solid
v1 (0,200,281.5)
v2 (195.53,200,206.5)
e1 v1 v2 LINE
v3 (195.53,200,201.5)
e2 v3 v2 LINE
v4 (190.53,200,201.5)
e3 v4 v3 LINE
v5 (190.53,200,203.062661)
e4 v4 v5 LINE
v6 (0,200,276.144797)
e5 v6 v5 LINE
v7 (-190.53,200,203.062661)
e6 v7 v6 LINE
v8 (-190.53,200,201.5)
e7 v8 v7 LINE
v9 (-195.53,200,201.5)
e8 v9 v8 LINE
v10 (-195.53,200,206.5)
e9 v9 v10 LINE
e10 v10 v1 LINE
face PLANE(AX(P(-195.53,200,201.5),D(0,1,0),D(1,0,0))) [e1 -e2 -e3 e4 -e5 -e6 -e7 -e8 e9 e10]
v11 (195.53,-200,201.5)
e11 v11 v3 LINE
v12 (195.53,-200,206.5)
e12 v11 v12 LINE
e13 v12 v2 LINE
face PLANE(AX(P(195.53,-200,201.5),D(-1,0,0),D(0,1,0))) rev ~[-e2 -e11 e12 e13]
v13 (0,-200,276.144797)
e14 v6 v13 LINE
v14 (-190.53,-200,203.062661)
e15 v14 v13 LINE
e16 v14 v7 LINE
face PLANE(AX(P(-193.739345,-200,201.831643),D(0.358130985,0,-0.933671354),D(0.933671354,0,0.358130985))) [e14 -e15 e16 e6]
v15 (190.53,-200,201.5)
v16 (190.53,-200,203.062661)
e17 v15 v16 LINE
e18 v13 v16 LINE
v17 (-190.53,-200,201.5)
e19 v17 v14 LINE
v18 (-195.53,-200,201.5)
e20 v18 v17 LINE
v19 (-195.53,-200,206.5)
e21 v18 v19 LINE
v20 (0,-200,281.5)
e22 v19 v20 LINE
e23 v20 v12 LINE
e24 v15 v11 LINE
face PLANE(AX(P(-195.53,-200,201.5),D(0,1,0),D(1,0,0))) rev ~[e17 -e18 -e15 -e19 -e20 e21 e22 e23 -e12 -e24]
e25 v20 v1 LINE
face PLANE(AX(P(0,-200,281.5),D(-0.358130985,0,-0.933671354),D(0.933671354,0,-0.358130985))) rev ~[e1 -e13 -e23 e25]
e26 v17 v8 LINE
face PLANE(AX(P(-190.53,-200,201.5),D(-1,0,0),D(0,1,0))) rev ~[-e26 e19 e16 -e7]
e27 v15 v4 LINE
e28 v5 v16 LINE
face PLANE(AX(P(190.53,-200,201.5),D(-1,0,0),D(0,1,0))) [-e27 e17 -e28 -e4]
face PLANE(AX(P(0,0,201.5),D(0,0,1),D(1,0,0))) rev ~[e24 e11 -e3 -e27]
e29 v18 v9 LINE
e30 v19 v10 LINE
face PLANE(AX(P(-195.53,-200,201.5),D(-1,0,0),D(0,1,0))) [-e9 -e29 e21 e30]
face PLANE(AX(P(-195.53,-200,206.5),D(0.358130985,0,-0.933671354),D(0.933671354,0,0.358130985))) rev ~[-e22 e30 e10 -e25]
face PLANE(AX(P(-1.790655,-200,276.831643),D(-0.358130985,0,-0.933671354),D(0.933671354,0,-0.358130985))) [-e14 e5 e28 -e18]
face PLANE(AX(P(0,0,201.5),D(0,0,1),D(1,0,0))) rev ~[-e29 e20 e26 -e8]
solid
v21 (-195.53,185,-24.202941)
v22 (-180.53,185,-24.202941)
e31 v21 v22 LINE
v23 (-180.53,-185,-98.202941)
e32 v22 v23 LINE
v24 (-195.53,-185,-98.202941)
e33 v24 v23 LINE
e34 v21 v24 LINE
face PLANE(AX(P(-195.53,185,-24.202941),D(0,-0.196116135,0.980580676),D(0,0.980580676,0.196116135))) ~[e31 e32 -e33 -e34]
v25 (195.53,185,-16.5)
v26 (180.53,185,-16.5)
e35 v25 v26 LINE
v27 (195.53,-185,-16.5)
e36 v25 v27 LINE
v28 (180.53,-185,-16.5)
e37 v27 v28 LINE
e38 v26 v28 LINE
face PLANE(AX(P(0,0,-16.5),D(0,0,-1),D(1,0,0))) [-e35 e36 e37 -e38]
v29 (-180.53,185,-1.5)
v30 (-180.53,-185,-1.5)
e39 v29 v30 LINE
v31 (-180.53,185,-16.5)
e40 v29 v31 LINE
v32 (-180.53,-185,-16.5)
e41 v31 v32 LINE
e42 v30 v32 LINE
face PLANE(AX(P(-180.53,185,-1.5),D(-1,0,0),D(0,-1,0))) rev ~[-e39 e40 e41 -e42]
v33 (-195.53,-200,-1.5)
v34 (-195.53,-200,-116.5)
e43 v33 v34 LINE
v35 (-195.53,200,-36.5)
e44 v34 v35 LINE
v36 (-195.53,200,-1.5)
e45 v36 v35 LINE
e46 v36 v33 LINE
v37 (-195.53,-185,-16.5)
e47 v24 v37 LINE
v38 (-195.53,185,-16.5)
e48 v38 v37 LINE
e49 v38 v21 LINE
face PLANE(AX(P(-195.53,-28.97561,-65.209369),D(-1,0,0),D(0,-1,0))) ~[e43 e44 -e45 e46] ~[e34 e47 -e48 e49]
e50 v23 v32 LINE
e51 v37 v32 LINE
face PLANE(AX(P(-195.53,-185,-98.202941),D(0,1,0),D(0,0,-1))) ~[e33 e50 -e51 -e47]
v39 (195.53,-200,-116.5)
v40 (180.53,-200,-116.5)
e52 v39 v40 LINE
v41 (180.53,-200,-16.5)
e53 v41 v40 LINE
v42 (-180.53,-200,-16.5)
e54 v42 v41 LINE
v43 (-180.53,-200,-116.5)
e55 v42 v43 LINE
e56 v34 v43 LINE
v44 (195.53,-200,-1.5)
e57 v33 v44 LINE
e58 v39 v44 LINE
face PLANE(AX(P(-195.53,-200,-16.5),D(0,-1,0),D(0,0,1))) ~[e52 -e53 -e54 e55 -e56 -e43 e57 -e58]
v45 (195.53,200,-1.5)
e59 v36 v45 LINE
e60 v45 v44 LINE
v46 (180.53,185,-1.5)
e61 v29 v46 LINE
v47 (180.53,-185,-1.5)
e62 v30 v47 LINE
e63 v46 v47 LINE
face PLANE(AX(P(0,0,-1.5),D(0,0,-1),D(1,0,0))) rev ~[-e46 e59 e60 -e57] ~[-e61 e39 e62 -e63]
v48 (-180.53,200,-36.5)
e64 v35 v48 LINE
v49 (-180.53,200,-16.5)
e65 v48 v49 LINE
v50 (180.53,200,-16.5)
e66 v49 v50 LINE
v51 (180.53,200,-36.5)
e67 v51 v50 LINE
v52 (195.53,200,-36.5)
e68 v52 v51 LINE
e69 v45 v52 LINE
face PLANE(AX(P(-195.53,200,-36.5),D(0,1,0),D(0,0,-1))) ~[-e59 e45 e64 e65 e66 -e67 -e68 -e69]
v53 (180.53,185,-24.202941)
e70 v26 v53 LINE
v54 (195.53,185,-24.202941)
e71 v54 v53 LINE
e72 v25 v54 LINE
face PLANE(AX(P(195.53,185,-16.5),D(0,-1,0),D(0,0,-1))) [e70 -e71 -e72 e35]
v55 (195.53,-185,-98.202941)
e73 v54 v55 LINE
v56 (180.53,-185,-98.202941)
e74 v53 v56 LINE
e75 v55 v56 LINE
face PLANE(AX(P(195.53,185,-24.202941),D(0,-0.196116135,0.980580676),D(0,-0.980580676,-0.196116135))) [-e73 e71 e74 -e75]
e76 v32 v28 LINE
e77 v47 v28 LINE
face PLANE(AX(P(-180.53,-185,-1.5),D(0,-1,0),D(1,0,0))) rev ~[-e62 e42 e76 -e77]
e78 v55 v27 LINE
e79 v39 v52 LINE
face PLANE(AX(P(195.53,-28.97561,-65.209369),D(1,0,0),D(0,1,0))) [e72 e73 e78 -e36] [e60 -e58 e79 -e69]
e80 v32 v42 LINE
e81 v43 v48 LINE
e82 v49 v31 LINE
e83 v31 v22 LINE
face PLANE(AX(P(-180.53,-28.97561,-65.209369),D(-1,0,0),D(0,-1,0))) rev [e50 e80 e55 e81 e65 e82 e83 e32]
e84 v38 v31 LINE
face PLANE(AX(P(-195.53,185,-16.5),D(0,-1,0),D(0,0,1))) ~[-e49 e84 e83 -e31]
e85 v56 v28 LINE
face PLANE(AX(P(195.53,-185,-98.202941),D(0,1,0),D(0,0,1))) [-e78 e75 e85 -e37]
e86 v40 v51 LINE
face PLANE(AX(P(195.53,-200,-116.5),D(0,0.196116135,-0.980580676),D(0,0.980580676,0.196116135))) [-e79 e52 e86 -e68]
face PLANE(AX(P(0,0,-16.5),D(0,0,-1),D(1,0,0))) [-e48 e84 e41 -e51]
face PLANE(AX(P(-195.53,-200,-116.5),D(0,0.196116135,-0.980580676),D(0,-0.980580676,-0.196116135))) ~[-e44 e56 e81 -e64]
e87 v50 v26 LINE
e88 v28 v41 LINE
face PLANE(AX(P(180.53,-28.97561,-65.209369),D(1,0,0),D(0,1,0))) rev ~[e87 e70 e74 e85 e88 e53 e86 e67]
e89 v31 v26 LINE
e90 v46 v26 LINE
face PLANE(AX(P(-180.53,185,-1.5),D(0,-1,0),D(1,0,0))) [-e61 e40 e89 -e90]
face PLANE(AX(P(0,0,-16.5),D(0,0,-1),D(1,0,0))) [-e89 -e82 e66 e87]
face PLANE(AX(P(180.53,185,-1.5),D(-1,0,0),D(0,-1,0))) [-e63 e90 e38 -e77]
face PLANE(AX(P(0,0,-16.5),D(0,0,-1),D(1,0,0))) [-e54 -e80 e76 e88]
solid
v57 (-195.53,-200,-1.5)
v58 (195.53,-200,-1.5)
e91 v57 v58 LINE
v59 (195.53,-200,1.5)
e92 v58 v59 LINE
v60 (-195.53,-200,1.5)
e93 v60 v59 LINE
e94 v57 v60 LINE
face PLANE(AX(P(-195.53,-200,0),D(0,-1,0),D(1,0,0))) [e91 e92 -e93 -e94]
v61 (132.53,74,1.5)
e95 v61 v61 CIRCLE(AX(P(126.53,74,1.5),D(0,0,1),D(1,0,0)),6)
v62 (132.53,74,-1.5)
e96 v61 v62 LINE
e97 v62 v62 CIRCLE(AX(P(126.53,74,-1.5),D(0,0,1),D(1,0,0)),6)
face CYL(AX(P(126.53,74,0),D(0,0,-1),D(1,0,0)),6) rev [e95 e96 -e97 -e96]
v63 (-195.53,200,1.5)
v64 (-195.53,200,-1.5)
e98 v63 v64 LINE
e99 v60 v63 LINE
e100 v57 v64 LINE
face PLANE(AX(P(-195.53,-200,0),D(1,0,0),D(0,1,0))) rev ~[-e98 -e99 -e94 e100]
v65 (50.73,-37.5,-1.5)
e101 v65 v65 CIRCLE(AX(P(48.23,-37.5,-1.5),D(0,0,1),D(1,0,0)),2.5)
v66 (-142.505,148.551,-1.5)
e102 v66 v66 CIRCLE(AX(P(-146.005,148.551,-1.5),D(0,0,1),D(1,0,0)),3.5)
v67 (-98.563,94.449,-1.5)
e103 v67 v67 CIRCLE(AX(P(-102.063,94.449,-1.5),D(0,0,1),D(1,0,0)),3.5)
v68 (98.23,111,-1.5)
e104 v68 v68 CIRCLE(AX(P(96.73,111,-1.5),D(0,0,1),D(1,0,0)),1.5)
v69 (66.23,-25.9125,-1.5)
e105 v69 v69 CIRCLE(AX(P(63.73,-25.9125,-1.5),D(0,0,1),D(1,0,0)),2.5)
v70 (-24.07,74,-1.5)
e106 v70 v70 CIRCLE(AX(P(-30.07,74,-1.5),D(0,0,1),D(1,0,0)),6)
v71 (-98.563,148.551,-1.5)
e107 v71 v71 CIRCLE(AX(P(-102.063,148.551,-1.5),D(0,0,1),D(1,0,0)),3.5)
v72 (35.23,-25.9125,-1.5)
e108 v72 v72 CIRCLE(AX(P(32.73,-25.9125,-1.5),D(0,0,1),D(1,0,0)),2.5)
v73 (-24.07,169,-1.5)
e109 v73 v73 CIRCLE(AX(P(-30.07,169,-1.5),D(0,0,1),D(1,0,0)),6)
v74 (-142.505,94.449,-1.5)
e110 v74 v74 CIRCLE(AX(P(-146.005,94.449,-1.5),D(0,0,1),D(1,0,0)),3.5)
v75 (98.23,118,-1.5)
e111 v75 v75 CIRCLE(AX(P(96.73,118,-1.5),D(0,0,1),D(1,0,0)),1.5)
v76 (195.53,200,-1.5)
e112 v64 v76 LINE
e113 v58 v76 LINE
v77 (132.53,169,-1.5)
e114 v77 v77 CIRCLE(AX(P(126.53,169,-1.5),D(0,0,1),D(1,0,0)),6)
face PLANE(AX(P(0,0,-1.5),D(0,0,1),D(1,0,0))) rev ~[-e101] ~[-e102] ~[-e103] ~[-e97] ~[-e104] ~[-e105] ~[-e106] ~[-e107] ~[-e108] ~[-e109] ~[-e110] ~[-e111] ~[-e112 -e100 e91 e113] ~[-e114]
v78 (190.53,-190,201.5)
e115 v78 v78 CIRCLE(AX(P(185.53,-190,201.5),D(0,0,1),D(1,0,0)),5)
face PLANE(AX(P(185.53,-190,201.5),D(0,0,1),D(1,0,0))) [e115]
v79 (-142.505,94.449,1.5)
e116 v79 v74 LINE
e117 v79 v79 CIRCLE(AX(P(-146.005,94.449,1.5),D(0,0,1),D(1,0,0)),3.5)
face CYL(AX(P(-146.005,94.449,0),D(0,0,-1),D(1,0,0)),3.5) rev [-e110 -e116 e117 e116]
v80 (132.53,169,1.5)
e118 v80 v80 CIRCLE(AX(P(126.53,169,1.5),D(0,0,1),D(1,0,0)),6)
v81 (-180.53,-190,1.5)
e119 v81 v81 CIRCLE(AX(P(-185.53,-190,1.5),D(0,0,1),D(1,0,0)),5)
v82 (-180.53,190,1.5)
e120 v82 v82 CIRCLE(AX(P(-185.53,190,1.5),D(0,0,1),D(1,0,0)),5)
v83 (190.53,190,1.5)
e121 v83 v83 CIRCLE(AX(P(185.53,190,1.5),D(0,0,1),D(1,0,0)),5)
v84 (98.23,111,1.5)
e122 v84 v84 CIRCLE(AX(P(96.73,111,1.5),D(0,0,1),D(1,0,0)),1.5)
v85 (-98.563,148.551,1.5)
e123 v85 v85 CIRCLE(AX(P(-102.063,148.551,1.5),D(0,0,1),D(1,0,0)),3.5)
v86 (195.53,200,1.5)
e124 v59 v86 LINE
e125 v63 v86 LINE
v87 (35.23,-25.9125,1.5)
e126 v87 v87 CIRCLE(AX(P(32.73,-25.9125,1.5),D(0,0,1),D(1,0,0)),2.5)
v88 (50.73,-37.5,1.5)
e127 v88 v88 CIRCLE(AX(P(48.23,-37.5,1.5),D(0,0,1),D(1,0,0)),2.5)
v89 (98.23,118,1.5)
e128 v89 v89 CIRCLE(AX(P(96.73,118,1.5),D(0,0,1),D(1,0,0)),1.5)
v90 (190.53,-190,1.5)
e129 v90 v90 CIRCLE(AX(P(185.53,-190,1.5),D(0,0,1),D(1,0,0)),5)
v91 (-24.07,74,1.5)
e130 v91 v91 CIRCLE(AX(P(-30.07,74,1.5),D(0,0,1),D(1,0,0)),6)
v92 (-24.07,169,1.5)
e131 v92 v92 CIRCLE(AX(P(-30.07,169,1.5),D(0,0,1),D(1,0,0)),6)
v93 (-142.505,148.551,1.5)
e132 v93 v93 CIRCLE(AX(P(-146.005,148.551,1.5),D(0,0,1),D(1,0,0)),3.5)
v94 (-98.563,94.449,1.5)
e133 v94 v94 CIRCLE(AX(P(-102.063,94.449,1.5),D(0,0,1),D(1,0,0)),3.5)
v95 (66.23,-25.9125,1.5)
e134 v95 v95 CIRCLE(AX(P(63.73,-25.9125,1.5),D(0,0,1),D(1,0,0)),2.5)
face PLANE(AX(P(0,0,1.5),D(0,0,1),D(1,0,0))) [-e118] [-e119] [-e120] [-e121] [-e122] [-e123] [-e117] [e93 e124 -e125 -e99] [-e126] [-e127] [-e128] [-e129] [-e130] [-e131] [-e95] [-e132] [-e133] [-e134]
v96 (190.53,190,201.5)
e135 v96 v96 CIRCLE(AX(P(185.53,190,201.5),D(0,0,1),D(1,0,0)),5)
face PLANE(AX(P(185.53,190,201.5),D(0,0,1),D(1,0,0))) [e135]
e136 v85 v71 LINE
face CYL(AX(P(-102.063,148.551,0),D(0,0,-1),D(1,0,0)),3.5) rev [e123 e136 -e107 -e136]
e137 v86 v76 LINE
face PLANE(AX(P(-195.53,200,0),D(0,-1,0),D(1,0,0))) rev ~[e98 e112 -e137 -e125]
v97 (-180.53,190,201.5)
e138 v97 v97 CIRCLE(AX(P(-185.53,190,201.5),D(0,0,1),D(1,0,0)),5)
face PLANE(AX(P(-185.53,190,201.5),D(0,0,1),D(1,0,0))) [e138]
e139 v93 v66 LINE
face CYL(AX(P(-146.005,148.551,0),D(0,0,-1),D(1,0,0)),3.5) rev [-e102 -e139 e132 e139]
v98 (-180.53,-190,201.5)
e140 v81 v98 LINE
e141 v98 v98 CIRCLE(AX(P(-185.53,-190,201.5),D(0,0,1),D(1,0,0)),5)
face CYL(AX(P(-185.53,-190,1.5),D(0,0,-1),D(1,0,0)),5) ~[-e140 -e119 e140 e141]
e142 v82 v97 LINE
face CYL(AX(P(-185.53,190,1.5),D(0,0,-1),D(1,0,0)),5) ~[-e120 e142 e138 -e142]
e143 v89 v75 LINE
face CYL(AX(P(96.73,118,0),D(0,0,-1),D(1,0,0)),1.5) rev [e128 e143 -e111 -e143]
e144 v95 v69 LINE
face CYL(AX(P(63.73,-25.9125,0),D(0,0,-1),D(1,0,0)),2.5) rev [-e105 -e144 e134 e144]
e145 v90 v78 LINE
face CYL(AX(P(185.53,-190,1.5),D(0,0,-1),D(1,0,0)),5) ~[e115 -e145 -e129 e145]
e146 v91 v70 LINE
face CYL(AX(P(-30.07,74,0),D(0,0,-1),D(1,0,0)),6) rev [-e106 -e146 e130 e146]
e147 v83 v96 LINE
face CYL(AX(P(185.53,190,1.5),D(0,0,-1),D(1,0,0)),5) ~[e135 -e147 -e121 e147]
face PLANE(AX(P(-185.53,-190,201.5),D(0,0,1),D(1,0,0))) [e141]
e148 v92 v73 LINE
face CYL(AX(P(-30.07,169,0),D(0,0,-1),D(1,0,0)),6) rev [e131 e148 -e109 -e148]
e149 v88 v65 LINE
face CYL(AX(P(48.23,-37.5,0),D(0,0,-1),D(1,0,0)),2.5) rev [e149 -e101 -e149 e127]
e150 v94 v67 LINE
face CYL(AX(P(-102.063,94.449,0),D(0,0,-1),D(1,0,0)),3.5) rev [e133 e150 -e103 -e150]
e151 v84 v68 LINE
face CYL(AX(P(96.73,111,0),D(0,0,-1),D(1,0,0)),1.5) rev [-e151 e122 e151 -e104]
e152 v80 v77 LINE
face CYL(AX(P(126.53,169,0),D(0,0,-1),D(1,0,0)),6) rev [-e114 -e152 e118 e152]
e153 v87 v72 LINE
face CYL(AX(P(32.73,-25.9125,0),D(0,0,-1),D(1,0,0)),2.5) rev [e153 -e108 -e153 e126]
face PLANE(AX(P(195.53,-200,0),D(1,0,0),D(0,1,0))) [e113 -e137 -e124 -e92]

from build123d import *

# Parameters (mm, degrees)
F0_W      = 391.06
F0_H      = 400
F0_R      = 2.5
F0_R_2    = 3.5
F0_R_3    = 6
F0_R_4    = 1.5
F1_DEPTH  = 1.5
F2_W      = 391.06
F2_H      = 400
F2_W_2    = 361.06
F2_H_2    = 370
F3_DEPTH  = 15
F5_DEPTH  = 15
F7_R      = 5
F8_DEPTH  = 200
F9_W      = 391.06
F9_H      = 400
F10_DEPTH = 80
F12_DEPTH = 400
F13_T     = -5


with BuildPart() as f1:
    # F0 (on Top) → F1 (new body, symmetric)
    with BuildSketch(Plane.XY):
        Rectangle(F0_W, F0_H)
        with Locations((32.73, -25.9125)):
            Circle(F0_R, mode=Mode.SUBTRACT)
        with Locations((48.23, -37.5)):
            Circle(F0_R, mode=Mode.SUBTRACT)
        with Locations((63.73, -25.9125)):
            Circle(F0_R, mode=Mode.SUBTRACT)
        with Locations((-146.005, 94.449)):
            Circle(F0_R_2, mode=Mode.SUBTRACT)
        with Locations((-102.063, 94.449)):
            Circle(F0_R_2, mode=Mode.SUBTRACT)
        with Locations((-30.07, 74)):
            Circle(F0_R_3, mode=Mode.SUBTRACT)
        with Locations((-146.005, 148.551)):
            Circle(F0_R_2, mode=Mode.SUBTRACT)
        with Locations((-102.063, 148.551)):
            Circle(F0_R_2, mode=Mode.SUBTRACT)
        with Locations((-30.07, 169)):
            Circle(F0_R_3, mode=Mode.SUBTRACT)
        with Locations((126.53, 74)):
            Circle(F0_R_3, mode=Mode.SUBTRACT)
        with Locations((96.73, 111)):
            Circle(F0_R_4, mode=Mode.SUBTRACT)
        with Locations((96.73, 118)):
            Circle(F0_R_4, mode=Mode.SUBTRACT)
        with Locations((126.53, 169)):
            Circle(F0_R_3, mode=Mode.SUBTRACT)
    extrude(amount=F1_DEPTH, both=True)

    # F7 (on face) → F8 (join)
    with BuildSketch(Plane.XY.offset(1.5)):
        with Locations((-185.53, 190)):
            Circle(F7_R)
        with Locations((185.53, 190)):
            Circle(F7_R)
        with Locations((185.53, -190)):
            Circle(F7_R)
        with Locations((-185.53, -190)):
            Circle(F7_R)
    extrude(amount=F8_DEPTH)


with BuildPart() as f3:
    # F2 (on face) → F3 (new body)
    with BuildSketch(Plane(origin=(0, 0, -1.5), x_dir=(1, 0, 0), z_dir=(0, 0, -1))):
        Rectangle(F2_W, F2_H)
        Rectangle(F2_W_2, F2_H_2, mode=Mode.SUBTRACT)
    extrude(amount=F3_DEPTH)

    # F4 (on face) → F5 (join)
    with BuildSketch(Plane.YZ.offset(195.53)):
        Polygon((-185, -16.5), (-200, -16.5), (-200, -116.5), (200, -36.5), (200, -16.5), (185, -16.5), (185, -24.2029414592), (-185, -98.2029414592), align=None)
    extrude(amount=-F5_DEPTH)

    # F6: F3 across plane


with BuildPart() as f3_1:
    add(f3.part)
    add(f3.part.mirror(Plane.YZ))


with BuildPart() as f10:
    # F9 (on face) → F10 (new body)
    with BuildSketch(Plane.XY.offset(201.5)):
        Rectangle(F9_W, F9_H)
    extrude(amount=F10_DEPTH)

    # F11 (on face) → F12 (cut, through all)
    with BuildSketch(Plane.XZ.offset(200)):
        Polygon((-195.53, 281.5), (-195.53, 206.5), (0, 281.5), align=None)
        Polygon((195.53, 281.5), (0, 281.5), (195.53, 206.5), align=None)
    extrude(amount=-F12_DEPTH, mode=Mode.SUBTRACT)

    # F13
    f13_openings = [f10.faces().sort_by_distance(p)[0] for p in [
        (0, 0, 201.5),
        (0, 200, 228.264706),
        (0, -200, 228.264706),
    ]]
    offset(amount=F13_T, openings=f13_openings)


solid = Compound([f1.part, f3_1.part, f10.part])
